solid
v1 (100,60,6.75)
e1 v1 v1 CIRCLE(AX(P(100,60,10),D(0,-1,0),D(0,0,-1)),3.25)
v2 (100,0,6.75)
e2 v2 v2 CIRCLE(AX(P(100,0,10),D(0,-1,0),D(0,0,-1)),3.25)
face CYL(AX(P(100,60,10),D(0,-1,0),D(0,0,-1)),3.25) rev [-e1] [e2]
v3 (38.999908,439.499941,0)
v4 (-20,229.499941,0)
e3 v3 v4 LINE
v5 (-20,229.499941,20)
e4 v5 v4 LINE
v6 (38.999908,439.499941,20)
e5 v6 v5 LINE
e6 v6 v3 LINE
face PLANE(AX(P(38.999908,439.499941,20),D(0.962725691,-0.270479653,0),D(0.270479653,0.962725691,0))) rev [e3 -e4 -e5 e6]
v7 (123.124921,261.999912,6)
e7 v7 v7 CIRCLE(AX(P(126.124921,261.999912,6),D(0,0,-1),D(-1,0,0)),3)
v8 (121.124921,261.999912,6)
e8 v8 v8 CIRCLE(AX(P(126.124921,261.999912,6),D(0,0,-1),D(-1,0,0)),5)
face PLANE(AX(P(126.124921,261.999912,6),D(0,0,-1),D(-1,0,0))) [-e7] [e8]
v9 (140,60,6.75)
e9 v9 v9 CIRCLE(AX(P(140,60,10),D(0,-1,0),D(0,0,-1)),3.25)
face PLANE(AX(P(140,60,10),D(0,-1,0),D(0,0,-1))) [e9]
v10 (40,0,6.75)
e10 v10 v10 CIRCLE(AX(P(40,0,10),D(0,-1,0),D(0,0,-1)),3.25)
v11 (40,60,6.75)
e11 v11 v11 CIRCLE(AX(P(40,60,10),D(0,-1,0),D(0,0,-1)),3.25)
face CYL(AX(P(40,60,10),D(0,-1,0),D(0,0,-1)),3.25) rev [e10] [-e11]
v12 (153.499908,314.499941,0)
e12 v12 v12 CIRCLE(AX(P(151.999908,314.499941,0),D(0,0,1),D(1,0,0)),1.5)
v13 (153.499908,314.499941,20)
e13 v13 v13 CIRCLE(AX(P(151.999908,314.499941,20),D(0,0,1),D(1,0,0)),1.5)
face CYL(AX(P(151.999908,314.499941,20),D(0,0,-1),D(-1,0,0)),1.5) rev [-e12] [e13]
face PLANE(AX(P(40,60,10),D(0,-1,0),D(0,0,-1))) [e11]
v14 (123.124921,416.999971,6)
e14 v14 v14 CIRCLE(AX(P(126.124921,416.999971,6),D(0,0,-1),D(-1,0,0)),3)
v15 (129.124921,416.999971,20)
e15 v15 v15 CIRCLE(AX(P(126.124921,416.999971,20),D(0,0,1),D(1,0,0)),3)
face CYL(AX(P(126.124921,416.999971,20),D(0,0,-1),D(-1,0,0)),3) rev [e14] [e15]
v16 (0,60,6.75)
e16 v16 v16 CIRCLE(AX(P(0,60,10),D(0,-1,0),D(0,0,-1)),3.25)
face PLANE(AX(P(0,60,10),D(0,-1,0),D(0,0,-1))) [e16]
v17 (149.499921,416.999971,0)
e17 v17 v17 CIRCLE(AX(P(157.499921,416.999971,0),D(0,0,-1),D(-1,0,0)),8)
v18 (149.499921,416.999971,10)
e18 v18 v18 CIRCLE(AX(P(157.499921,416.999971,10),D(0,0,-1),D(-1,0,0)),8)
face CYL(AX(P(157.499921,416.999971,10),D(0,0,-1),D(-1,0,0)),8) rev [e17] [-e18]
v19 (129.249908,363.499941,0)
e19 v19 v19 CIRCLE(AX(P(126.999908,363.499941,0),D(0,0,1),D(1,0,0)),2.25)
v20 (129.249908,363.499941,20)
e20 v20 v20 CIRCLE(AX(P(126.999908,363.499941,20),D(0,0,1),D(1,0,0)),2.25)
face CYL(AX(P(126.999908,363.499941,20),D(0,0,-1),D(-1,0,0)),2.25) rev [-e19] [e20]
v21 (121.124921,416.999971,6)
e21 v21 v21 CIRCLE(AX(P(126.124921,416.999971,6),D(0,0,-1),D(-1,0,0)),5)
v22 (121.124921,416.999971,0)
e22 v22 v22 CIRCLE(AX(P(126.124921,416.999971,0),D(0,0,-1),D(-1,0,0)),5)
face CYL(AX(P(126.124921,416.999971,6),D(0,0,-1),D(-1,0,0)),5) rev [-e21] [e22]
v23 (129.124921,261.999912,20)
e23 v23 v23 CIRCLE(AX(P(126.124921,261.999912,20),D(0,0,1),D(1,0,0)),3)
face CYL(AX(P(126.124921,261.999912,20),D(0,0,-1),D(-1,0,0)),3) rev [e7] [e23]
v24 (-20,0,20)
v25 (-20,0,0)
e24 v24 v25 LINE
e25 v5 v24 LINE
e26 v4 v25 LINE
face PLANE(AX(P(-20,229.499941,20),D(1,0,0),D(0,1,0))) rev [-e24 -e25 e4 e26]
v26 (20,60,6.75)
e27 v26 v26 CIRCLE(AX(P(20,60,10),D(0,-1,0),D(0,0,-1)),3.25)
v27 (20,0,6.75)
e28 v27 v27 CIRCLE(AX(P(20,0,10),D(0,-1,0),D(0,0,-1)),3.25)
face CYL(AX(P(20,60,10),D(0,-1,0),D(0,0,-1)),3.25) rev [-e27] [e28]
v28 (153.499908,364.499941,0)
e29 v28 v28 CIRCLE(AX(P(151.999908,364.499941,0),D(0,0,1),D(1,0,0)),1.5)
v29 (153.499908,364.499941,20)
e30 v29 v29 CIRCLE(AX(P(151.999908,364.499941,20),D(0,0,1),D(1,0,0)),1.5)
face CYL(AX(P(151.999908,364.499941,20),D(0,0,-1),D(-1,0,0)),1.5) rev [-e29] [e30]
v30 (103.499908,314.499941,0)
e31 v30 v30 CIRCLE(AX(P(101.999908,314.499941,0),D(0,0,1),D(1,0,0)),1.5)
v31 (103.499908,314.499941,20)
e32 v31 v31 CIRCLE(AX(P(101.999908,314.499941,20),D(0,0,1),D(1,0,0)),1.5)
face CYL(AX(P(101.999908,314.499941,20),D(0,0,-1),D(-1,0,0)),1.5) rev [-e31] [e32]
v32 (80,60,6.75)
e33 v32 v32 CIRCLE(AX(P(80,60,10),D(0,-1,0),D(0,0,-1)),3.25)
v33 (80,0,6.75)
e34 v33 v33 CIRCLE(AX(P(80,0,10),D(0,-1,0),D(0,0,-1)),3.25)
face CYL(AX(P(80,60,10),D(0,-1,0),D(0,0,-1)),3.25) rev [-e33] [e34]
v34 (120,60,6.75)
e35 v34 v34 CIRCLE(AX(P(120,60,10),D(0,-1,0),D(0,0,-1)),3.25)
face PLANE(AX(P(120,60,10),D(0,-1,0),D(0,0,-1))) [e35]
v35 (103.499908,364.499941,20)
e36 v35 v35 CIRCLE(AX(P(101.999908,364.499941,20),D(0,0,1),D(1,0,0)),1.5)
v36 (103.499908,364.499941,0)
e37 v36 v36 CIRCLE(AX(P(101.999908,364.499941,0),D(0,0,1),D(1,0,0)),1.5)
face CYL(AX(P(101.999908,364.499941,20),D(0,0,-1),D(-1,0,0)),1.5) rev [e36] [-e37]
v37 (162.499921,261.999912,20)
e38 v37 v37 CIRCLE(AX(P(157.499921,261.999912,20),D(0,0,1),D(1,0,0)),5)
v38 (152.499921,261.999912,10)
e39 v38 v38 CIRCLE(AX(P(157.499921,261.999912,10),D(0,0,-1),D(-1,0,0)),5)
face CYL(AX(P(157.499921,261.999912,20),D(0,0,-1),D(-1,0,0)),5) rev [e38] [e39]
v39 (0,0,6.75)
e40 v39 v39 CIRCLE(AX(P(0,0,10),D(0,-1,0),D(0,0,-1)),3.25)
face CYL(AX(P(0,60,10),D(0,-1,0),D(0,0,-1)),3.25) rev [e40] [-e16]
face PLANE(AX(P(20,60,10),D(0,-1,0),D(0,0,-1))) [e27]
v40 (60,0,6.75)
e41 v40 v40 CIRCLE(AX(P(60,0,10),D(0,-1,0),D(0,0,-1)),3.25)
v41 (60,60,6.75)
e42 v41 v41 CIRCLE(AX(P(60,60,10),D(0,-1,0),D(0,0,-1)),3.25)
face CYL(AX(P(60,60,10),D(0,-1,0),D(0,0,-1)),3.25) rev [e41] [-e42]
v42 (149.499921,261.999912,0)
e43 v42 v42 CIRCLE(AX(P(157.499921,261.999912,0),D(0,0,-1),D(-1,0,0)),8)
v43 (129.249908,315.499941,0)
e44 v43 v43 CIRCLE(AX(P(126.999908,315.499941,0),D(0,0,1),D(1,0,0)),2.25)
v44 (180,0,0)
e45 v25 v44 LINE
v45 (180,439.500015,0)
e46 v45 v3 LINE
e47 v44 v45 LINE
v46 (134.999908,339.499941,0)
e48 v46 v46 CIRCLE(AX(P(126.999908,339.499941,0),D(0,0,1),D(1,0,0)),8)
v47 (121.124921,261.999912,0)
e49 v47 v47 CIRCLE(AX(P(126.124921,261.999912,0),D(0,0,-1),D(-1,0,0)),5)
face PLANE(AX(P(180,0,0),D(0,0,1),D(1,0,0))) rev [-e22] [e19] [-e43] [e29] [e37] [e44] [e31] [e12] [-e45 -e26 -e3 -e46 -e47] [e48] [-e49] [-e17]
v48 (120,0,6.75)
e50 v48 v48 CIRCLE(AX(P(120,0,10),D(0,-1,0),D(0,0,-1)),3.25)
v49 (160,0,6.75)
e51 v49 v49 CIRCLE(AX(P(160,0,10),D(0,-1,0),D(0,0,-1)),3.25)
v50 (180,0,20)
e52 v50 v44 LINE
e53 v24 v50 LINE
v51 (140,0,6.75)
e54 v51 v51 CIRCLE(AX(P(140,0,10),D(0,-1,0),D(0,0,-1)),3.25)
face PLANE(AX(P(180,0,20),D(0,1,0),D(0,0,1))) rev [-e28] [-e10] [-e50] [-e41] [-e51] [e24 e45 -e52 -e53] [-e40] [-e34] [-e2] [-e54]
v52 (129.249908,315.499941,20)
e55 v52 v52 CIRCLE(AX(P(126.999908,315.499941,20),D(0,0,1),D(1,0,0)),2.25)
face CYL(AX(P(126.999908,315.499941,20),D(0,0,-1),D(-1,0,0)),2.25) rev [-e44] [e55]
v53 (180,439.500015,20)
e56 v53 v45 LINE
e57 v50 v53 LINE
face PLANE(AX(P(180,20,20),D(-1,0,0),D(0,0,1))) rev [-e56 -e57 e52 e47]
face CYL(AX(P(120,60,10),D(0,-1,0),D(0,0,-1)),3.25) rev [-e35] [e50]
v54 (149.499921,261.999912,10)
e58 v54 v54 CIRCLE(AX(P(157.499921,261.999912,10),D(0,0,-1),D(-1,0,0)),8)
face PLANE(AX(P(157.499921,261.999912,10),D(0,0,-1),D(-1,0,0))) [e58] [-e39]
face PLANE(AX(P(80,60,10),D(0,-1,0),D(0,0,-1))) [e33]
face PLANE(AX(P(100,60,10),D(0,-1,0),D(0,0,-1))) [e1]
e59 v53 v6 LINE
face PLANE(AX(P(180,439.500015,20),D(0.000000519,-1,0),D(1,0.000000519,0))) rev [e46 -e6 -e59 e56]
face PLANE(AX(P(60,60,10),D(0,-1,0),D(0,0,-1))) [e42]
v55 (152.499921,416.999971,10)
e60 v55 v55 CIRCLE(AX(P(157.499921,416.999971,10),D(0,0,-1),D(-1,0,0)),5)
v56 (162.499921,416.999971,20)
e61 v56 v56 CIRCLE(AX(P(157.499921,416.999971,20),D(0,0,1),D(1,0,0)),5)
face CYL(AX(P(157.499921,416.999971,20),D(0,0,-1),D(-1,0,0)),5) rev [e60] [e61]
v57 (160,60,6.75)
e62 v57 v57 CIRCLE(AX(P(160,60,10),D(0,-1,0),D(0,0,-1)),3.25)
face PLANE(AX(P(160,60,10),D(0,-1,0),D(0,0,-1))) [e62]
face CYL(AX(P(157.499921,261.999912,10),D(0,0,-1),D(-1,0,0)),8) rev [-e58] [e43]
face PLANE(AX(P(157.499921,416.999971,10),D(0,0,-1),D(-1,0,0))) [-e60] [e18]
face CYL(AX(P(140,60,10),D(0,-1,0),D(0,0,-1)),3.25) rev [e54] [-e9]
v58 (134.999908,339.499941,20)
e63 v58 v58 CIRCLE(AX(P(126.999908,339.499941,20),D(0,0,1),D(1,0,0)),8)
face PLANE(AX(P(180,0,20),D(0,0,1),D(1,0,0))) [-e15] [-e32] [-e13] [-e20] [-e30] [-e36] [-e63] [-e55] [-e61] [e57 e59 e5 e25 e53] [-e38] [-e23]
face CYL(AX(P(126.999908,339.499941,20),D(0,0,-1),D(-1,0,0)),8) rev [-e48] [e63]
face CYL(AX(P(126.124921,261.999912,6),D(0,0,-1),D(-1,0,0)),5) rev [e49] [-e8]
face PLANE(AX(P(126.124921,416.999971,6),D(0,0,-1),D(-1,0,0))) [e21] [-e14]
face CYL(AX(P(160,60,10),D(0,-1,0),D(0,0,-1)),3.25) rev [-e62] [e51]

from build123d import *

# Parameters (mm, degrees)
SKETCH1_R                  = 8
SKETCH1_R_2                = 5
SKETCH1_R_3                = 2.25
SKETCH1_R_4                = 1.5
SKETCH1_R_5                = 3
EXTRUDE1_DEPTH             = 20
CUT_EXTRUDE1_START         = -10
CUT_EXTRUDE1_OUTLINE_R     = 8
CUT_EXTRUDE1_OUTLINE_R_2   = 5
CUT_EXTRUDE1_DEPTH         = 10
CUT_EXTRUDE1_START_2       = -6
CUT_EXTRUDE1_2_OUTLINE_R   = 5
CUT_EXTRUDE1_2_OUTLINE_R_2 = 3
CUT_EXTRUDE1_2_DEPTH       = 6
CUT_EXTRUDE1_3_OUTLINE_R   = 3.25
CUT_EXTRUDE1_3_DEPTH       = 60


# Read off the part's stored shape, not the designer's step: Cut-Extrude1
with BuildPart() as part:
    # Sketch1 → Extrude1 (new body)
    with BuildSketch(Plane.XY):
        Polygon((38.999908, 439.49994136), (-20, 229.49994136), (-20, 0), (180, 0), (180, 20), (180, 439.50001453), align=None)
        with Locations((126.999908, 339.49994136)):
            Circle(SKETCH1_R, mode=Mode.SUBTRACT)
        with Locations((157.49992067, 416.99997068)):
            Circle(SKETCH1_R_2, mode=Mode.SUBTRACT)
        with Locations((126.999908, 363.49994136)):
            Circle(SKETCH1_R_3, mode=Mode.SUBTRACT)
        with Locations((126.999908, 315.49994136)):
            Circle(SKETCH1_R_3, mode=Mode.SUBTRACT)
        with Locations((157.49992067, 261.99991204)):
            Circle(SKETCH1_R_2, mode=Mode.SUBTRACT)
        with Locations((151.999908, 364.49994136)):
            Circle(SKETCH1_R_4, mode=Mode.SUBTRACT)
        with Locations((151.999908, 314.49994136)):
            Circle(SKETCH1_R_4, mode=Mode.SUBTRACT)
        with Locations((101.999908, 364.49994136)):
            Circle(SKETCH1_R_4, mode=Mode.SUBTRACT)
        with Locations((101.999908, 314.49994136)):
            Circle(SKETCH1_R_4, mode=Mode.SUBTRACT)
        with Locations((126.12492067, 416.99997068)):
            Circle(SKETCH1_R_5, mode=Mode.SUBTRACT)
        with Locations((126.12492067, 261.99991204)):
            Circle(SKETCH1_R_5, mode=Mode.SUBTRACT)
    extrude(amount=EXTRUDE1_DEPTH)

    # Cut-Extrude1 outline → Cut-Extrude1 (cut)
    # profile 1 of 2: a face of its own
    with BuildSketch(Plane(origin=(0, 0, 0), x_dir=(-1, 0, 0), z_dir=(0, 0, -1)).offset(CUT_EXTRUDE1_START)):
        with Locations((-157.49992067, 416.99997068)):
            Circle(CUT_EXTRUDE1_OUTLINE_R)
        with Locations((-157.49992067, 416.99997068)):
            Circle(CUT_EXTRUDE1_OUTLINE_R_2, mode=Mode.SUBTRACT)
    # profile 2 of 2: a face of its own
    with BuildSketch(Plane(origin=(0, 0, 0), x_dir=(-1, 0, 0), z_dir=(0, 0, -1)).offset(CUT_EXTRUDE1_START)):
        with Locations((-157.49992067, 261.99991204)):
            Circle(CUT_EXTRUDE1_OUTLINE_R)
        with Locations((-157.49992067, 261.99991204)):
            Circle(CUT_EXTRUDE1_OUTLINE_R_2, mode=Mode.SUBTRACT)
    extrude(amount=CUT_EXTRUDE1_DEPTH, mode=Mode.SUBTRACT)

    # Cut-Extrude1 2 outline → Cut-Extrude1 2 (cut)
    # profile 1 of 2: a face of its own
    with BuildSketch(Plane(origin=(0, 0, 0), x_dir=(-1, 0, 0), z_dir=(0, 0, -1)).offset(CUT_EXTRUDE1_START_2)):
        with Locations((-126.12492067, 416.99997068)):
            Circle(CUT_EXTRUDE1_2_OUTLINE_R)
        with Locations((-126.12492067, 416.99997068)):
            Circle(CUT_EXTRUDE1_2_OUTLINE_R_2, mode=Mode.SUBTRACT)
    # profile 2 of 2: a face of its own
    with BuildSketch(Plane(origin=(0, 0, 0), x_dir=(-1, 0, 0), z_dir=(0, 0, -1)).offset(CUT_EXTRUDE1_START_2)):
        with Locations((-126.12492067, 261.99991204)):
            Circle(CUT_EXTRUDE1_2_OUTLINE_R)
        with Locations((-126.12492067, 261.99991204)):
            Circle(CUT_EXTRUDE1_2_OUTLINE_R_2, mode=Mode.SUBTRACT)
    extrude(amount=CUT_EXTRUDE1_2_DEPTH, mode=Mode.SUBTRACT)

    # Cut-Extrude1 3 outline → Cut-Extrude1 3 (cut)
    with BuildSketch(Plane(origin=(0, 0, 0), x_dir=(1, 0, 0), z_dir=(0, 1, 0))):
        with Locations((20, -10)):
            Circle(CUT_EXTRUDE1_3_OUTLINE_R)
        with Locations((40, -10)):
            Circle(CUT_EXTRUDE1_3_OUTLINE_R)
        with Locations((60, -10)):
            Circle(CUT_EXTRUDE1_3_OUTLINE_R)
        with Locations((80, -10)):
            Circle(CUT_EXTRUDE1_3_OUTLINE_R)
        with Locations((100, -10)):
            Circle(CUT_EXTRUDE1_3_OUTLINE_R)
        with Locations((120, -10)):
            Circle(CUT_EXTRUDE1_3_OUTLINE_R)
        with Locations((140, -10)):
            Circle(CUT_EXTRUDE1_3_OUTLINE_R)
        with Locations((160, -10)):
            Circle(CUT_EXTRUDE1_3_OUTLINE_R)
        with Locations((0, -10)):
            Circle(CUT_EXTRUDE1_3_OUTLINE_R)
    extrude(amount=CUT_EXTRUDE1_3_DEPTH, mode=Mode.SUBTRACT)


solid = part.part
